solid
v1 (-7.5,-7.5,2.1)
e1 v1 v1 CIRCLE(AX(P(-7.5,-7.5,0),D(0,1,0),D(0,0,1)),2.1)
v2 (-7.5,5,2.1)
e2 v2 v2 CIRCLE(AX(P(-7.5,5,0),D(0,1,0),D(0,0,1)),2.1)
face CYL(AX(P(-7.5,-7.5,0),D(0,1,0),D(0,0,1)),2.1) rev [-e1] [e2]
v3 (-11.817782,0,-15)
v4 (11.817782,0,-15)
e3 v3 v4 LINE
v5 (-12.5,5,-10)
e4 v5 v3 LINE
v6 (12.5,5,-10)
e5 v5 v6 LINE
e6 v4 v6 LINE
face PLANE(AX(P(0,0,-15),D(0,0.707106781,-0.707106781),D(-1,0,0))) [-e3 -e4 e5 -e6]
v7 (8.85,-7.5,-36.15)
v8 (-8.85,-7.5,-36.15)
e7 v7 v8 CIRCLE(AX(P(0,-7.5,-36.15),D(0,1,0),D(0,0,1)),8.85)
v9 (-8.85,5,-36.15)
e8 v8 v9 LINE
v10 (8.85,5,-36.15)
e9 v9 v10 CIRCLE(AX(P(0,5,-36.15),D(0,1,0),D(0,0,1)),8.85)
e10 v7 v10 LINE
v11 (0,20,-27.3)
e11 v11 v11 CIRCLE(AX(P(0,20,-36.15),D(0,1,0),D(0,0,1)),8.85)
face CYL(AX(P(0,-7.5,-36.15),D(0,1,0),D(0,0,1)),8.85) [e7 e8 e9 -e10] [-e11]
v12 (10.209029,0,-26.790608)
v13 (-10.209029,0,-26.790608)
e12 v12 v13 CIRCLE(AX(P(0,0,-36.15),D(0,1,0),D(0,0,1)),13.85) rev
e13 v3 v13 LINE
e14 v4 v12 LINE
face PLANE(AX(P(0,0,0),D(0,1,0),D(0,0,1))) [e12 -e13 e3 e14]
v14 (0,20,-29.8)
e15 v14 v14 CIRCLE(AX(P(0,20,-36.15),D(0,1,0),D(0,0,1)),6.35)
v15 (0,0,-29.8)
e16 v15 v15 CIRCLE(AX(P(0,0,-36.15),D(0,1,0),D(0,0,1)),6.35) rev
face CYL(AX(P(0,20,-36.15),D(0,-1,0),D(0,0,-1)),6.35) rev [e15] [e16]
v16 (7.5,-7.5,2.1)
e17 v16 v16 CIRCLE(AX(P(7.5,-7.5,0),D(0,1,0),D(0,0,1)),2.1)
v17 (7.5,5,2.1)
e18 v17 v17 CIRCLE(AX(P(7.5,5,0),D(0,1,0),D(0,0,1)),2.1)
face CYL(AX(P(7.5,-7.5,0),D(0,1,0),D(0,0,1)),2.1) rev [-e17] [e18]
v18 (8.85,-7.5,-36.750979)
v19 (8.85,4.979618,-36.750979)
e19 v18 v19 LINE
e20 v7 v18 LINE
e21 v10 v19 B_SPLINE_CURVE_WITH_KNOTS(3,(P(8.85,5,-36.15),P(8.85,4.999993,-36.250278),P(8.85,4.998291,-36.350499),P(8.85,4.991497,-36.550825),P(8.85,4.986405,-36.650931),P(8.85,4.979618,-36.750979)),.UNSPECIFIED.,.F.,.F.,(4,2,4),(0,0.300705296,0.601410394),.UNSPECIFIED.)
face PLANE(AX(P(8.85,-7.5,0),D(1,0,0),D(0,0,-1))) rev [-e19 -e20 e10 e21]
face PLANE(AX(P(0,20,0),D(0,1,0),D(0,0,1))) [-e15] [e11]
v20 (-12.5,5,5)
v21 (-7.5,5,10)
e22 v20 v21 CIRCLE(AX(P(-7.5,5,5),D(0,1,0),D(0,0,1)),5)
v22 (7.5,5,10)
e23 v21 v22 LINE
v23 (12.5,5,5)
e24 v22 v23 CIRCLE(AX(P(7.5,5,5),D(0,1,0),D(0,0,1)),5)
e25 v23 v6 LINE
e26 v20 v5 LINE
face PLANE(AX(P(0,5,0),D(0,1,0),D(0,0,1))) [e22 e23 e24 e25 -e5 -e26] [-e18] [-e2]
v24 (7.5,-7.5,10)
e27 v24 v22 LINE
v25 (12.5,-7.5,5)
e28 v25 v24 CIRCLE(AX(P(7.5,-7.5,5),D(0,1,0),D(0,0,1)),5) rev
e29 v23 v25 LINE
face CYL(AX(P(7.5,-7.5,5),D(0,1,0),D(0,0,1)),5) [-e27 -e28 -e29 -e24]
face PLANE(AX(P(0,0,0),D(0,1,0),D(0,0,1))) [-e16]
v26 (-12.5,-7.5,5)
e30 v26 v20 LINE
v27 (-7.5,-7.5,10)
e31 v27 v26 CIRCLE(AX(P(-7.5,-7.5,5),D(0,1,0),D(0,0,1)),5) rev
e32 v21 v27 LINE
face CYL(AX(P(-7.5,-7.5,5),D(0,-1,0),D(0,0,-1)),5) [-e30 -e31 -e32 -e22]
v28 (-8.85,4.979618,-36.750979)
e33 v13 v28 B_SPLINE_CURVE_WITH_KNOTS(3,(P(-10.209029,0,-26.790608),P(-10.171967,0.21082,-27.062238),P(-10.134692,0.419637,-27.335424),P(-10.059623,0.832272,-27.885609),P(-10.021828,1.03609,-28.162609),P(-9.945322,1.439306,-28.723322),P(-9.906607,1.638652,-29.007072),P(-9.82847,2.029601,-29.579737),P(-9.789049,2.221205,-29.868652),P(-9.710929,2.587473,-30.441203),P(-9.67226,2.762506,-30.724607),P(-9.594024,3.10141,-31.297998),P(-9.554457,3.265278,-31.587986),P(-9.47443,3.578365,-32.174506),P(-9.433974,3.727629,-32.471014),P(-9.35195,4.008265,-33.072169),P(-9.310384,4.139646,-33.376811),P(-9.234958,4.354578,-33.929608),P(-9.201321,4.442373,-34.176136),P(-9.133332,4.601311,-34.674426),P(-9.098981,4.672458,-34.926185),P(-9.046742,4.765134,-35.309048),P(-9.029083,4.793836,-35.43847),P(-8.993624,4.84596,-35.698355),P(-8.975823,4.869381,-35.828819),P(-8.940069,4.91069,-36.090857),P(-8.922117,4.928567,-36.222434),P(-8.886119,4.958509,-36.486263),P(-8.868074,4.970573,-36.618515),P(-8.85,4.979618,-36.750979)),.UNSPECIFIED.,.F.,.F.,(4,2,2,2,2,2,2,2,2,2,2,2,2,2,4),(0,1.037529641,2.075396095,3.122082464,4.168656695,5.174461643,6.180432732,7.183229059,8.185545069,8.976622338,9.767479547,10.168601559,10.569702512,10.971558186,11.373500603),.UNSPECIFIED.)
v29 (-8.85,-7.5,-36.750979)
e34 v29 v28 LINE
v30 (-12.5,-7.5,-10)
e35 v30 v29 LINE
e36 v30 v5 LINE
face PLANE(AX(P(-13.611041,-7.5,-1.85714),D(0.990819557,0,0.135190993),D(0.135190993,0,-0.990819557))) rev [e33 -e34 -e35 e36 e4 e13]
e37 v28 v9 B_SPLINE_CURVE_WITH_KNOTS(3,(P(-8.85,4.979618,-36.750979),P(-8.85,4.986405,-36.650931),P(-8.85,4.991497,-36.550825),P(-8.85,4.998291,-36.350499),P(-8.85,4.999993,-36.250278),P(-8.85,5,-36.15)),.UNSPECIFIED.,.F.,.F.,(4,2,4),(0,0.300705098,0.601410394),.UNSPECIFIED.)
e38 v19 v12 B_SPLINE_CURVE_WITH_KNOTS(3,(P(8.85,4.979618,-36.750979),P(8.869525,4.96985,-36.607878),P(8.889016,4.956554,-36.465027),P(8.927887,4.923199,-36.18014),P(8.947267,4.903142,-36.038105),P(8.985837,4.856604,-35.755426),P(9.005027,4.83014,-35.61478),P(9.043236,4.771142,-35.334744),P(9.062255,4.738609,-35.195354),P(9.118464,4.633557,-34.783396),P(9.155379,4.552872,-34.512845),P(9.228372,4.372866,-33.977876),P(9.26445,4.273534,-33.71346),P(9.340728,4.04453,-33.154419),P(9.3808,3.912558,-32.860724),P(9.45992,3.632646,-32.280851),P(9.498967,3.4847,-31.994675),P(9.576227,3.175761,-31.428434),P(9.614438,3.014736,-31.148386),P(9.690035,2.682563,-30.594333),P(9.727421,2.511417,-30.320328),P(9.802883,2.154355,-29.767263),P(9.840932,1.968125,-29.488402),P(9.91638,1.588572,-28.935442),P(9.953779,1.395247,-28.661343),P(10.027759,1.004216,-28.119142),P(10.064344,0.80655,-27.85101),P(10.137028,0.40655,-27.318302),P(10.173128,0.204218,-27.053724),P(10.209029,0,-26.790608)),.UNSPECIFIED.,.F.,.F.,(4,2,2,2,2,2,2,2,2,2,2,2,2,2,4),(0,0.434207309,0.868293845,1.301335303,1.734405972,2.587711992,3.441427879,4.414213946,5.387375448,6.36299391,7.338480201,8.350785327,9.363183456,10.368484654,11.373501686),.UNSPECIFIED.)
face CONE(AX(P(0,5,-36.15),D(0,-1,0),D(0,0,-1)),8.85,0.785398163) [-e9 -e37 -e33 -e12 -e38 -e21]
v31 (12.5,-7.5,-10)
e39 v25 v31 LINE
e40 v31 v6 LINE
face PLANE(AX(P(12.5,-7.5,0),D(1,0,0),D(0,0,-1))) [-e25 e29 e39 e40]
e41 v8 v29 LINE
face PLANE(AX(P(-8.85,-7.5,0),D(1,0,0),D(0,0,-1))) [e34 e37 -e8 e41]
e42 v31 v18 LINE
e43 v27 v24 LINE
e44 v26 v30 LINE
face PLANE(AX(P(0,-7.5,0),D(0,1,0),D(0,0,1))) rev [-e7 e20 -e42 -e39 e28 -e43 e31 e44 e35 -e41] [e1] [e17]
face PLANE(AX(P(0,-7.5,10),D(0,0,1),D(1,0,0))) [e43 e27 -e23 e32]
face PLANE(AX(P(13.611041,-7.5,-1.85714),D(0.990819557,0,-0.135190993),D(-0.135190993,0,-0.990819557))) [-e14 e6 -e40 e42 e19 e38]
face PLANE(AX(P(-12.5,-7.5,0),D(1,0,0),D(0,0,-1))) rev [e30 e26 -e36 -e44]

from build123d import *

# Parameters (mm, degrees)
SKETCH1_W           = 25
SKETCH1_H           = 20
SKETCH1_R           = 2.1
SKETCH1_R_2         = 8.85
SKETCH1_R_3         = 6.35
BOSS_EXTRUDE1_DEPTH = 7.5
BOSS_EXTRUDE2_START = 5
SKETCH1_3_W         = 25
SKETCH1_3_H         = 20
SKETCH1_3_R         = 2.1
BOSS_EXTRUDE2_DEPTH = 5
BOSS_EXTRUDE3_START = 20
SKETCH1_4_R         = 8.85
SKETCH1_4_R_2       = 6.35
BOSS_EXTRUDE3_DEPTH = 20
CHAMFER1_DEPTH      = 5
CHAMFER1_START      = 10.606601718
CHAMFER1_3_DEPTH    = 8.337218533
CHAMFER1_START_2    = 7.071067812
CHAMFER1_4_DEPTH    = 3.535533906
FILLET1_R           = 5


with BuildPart() as part:
    # Sketch1 → Boss-Extrude1 (new body)
    # profile 1 of 6: a face of its own
    with BuildSketch(Plane(origin=(0, 0, 0), x_dir=(1, 0, 0), z_dir=(0, 1, 0))):
        Rectangle(SKETCH1_W, SKETCH1_H)
        with Locations(Location((7.5, 0, 0), (0, 0, 270))):
            Circle(SKETCH1_R, mode=Mode.SUBTRACT)
        with Locations(Location((-7.5, 0, 0), (0, 0, 270))):
            Circle(SKETCH1_R, mode=Mode.SUBTRACT)
    # profile 2 of 6: a face of its own
    with BuildSketch(Plane(origin=(0, 0, 0), x_dir=(1, 0, 0), z_dir=(0, 1, 0))):
        with Locations((0, 36.15)):
            Circle(SKETCH1_R_2)
        with Locations((0, 36.15)):
            Circle(SKETCH1_R_3, mode=Mode.SUBTRACT)
    # profile 3 of 6: a face of its own
    with BuildSketch(Plane(origin=(0, 0, 0), x_dir=(1, 0, 0), z_dir=(0, 1, 0))):
        with BuildLine():
            Line((-8.85, 36.15), (-8.85, 10))
            Line((-8.85, 10), (8.85, 10))
            Line((8.85, 10), (8.85, 36.15))
            ThreePointArc((8.85, 36.15), (0, 27.3), (-8.85, 36.15))
        make_face()
    # profile 4 of 6: a face of its own
    with BuildSketch(Plane(origin=(0, 0, 0), x_dir=(1, 0, 0), z_dir=(0, 1, 0))):
        with Locations((0, 36.15)):
            Circle(SKETCH1_R_3)
    # profile 5 of 6: a face of its own
    with BuildSketch(Plane(origin=(0, 0, 0), x_dir=(1, 0, 0), z_dir=(0, 1, 0))):
        Polygon((-8.85, 36.75097877), (-12.5, 10), (-8.85, 10), (-8.85, 36.15), align=None)
    # profile 6 of 6: a face of its own
    with BuildSketch(Plane(origin=(0, 0, 0), x_dir=(1, 0, 0), z_dir=(0, 1, 0))):
        Polygon((8.85, 36.15), (8.85, 10), (12.5, 10), (8.85, 36.75097877), align=None)
    extrude(amount=-BOSS_EXTRUDE1_DEPTH)

    # Sketch1<3> → Boss-Extrude2 (add)
    with BuildSketch(Plane(origin=(0, 0, 0), x_dir=(1, 0, 0), z_dir=(0, 1, 0)).offset(BOSS_EXTRUDE2_START)):
        Rectangle(SKETCH1_3_W, SKETCH1_3_H)
        with Locations(Location((7.5, 0, 0), (0, 0, 270))):
            Circle(SKETCH1_3_R, mode=Mode.SUBTRACT)
        with Locations(Location((-7.5, 0, 0), (0, 0, 270))):
            Circle(SKETCH1_3_R, mode=Mode.SUBTRACT)
    extrude(amount=-BOSS_EXTRUDE2_DEPTH)

    # Sketch1<4> → Boss-Extrude3 (add)
    with BuildSketch(Plane(origin=(0, 0, 0), x_dir=(1, 0, 0), z_dir=(0, 1, 0)).offset(BOSS_EXTRUDE3_START)):
        with Locations(Location((0, 36.15, 0), (0, 0, 270))):
            Circle(SKETCH1_4_R)
        with Locations(Location((0, 36.15, 0), (0, 0, 270))):
            Circle(SKETCH1_4_R_2, mode=Mode.SUBTRACT)
    extrude(amount=-BOSS_EXTRUDE3_DEPTH)

    # Chamfer1: read off the stored shape, not the designer's step
    # Chamfer1 outline → Chamfer1 (add)
    with BuildSketch(Plane(origin=(0, 0, 0), x_dir=(1, 0, 0), z_dir=(0, 1, 0))):
        with BuildLine():
            Line((8.85, 36.75097877), (8.85, 36.15))
            ThreePointArc((8.85, 36.15), (0, 27.3), (-8.85, 36.15))
            Line((-8.85, 36.15), (-8.85, 36.75097877))
            Line((-8.85, 36.75097877), (-12.5, 10))
            Line((-12.5, 10), (12.5, 10))
            Line((12.5, 10), (8.85, 36.75097877))
        make_face()
    extrude(amount=CHAMFER1_DEPTH)

    # Chamfer1 2 outline → Chamfer1 2 (revolve, cut)
    with BuildSketch(Plane.XY.offset(-36.15)):
        Polygon((8.85, 5), (13.85, 0), (24.227721121, 0), (24.227721121, 5), align=None)
    revolve(axis=Axis((0, 0, -36.15), (0, 1, 0)), mode=Mode.SUBTRACT)

    # Chamfer1 3 outline → Chamfer1 3 (cut)
    with BuildSketch(Plane(origin=(0, 0, 0), x_dir=(1, 0, 0), z_dir=(0, 0.7071067811865516, -0.7071067811865436)).offset(CHAMFER1_START)):
        Polygon((11.817781971, 10.606601718), (-11.817781971, 10.606601718), (-12.5, 3.535533906), (12.5, 3.535533906), align=None)
    extrude(amount=CHAMFER1_3_DEPTH, mode=Mode.SUBTRACT)

    # Chamfer1 4 outline → Chamfer1 4 (add)
    with BuildSketch(Plane(origin=(0, 0, 0), x_dir=(1, 0, 0), z_dir=(0, 0.7071067811865516, -0.7071067811865436)).offset(CHAMFER1_START_2)):
        Polygon((11.817781971, 10.606601718), (-11.817781971, 10.606601718), (-12.5, 3.535533906), (12.5, 3.535533906), align=None)
    extrude(amount=CHAMFER1_4_DEPTH)

    # Fillet1
    fillet1_edges = [part.edges().sort_by_distance(p)[0] for p in [
        (12.5, -1.25, 10),
        (-12.5, -1.25, 10),
    ]]
    fillet(fillet1_edges, radius=FILLET1_R)


solid = part.part
